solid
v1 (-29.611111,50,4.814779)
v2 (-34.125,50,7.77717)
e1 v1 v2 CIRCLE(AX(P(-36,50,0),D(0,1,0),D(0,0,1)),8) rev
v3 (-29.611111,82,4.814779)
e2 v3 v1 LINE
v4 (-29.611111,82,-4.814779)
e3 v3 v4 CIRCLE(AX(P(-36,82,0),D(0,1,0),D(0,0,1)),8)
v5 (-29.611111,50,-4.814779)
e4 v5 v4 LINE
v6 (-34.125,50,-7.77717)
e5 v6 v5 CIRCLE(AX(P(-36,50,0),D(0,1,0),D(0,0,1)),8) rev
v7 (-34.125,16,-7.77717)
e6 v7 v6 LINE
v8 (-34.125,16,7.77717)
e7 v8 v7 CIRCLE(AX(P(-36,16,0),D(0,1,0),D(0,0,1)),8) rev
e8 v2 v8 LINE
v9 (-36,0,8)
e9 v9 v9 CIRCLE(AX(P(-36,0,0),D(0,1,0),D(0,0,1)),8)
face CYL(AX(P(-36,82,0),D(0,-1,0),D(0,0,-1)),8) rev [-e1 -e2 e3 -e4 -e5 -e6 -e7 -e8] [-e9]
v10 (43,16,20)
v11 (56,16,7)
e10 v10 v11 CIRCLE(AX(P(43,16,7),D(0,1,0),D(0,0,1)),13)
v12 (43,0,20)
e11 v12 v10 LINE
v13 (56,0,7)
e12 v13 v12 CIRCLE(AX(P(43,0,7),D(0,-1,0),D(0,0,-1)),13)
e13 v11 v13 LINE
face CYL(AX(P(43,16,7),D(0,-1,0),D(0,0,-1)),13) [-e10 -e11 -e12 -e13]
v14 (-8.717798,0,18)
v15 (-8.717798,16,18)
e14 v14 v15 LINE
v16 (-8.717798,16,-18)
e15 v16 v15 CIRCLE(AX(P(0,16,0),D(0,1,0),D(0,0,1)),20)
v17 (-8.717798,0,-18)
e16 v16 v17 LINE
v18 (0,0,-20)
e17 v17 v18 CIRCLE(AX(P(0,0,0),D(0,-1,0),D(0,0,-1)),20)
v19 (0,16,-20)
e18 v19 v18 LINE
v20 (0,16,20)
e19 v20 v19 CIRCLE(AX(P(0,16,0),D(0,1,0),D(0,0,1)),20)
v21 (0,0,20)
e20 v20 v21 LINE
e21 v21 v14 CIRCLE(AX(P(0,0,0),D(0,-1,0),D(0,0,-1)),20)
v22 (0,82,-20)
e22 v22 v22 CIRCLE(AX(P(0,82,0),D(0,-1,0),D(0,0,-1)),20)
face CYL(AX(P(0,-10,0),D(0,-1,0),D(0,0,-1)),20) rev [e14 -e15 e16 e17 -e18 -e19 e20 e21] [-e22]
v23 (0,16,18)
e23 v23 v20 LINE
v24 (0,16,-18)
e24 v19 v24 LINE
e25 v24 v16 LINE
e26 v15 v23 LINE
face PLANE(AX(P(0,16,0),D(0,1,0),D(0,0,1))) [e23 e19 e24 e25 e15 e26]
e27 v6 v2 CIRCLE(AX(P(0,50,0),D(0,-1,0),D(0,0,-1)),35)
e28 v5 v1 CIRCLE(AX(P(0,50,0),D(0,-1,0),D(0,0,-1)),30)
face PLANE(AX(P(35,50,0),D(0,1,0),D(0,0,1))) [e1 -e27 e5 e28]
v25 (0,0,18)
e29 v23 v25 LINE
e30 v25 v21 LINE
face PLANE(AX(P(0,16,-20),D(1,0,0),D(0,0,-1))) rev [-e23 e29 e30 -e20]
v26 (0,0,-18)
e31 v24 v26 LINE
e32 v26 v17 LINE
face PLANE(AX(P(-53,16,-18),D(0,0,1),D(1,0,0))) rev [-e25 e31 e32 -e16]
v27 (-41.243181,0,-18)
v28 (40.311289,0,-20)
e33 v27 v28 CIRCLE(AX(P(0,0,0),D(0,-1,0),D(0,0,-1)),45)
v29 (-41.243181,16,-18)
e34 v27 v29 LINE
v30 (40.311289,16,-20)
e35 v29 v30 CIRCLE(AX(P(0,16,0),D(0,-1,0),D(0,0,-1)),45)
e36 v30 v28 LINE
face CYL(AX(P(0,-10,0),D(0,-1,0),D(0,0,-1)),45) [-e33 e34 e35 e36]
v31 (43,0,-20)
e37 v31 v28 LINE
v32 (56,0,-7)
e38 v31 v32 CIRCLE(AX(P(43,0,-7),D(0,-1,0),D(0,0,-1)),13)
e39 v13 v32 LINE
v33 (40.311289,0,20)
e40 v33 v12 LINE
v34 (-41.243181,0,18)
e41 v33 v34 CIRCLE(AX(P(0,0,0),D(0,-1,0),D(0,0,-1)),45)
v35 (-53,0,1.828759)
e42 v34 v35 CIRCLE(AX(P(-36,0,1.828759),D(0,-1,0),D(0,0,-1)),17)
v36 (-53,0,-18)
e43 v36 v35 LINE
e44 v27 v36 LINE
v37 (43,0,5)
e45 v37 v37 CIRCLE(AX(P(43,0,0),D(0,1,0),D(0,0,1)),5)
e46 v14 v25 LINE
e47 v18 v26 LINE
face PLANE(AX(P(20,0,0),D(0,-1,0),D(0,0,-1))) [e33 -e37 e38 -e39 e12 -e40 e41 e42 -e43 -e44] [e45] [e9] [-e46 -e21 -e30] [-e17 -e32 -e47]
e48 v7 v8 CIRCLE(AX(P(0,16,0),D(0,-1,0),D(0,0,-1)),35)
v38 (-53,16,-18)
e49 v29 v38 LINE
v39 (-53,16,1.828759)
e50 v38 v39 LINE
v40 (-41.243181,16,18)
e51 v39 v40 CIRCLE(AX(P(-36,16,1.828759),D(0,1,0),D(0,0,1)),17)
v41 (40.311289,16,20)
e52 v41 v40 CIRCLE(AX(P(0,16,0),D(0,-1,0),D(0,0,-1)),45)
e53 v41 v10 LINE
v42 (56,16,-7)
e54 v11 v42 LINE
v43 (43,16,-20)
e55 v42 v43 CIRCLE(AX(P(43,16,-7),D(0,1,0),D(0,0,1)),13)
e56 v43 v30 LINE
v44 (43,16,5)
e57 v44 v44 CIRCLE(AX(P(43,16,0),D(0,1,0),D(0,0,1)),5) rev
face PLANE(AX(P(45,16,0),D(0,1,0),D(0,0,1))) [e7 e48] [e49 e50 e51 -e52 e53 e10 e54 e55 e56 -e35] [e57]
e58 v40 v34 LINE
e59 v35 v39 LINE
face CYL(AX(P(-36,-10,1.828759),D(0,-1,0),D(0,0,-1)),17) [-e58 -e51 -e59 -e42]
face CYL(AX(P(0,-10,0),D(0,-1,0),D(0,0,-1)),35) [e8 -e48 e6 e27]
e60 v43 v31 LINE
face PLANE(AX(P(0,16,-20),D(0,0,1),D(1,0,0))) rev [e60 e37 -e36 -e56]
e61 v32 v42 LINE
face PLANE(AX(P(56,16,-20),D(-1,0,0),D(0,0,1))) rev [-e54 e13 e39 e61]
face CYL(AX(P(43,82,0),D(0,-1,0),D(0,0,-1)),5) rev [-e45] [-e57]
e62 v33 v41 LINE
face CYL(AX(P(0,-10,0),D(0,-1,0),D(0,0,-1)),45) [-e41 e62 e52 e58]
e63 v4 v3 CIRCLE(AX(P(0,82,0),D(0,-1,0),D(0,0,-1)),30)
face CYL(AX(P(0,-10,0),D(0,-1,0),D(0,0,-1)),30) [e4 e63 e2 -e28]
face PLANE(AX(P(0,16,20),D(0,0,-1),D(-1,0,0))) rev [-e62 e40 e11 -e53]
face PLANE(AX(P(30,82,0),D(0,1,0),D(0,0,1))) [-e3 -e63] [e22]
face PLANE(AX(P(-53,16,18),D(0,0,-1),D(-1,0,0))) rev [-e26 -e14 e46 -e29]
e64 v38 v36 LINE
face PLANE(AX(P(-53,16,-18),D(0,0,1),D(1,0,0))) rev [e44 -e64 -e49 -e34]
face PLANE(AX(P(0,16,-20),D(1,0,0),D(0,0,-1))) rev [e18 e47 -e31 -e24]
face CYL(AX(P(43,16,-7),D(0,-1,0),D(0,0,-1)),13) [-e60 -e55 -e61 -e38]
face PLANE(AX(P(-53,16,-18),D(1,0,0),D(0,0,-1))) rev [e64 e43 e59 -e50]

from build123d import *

# Parameters (mm, degrees)
SKETCH_9_W          = 53
SKETCH_9_H          = 36
EXTRUDE_1_DEPTH     = 16
SKETCH_10_W         = 56
SKETCH_10_H         = 40
EXTRUDE_2_DEPTH     = 16
SKETCH_11_R         = 8
CUT_EXTRUDE_3_DEPTH = 82
SKETCH_12_R         = 5
CUT_EXTRUDE_6_DEPTH = 82
FILLET_1_R          = 17
FILLET_2_R          = 13


with BuildPart() as part:
    # 草图8 → 旋转1 (revolve)
    with BuildSketch(Plane.XY, mode=Mode.PRIVATE) as revolve_1_sk:
        Polygon((20, 0), (45, 0), (45, 16), (35, 16), (35, 50), (30, 50), (30, 82), (20, 82), align=None)
    revolve(revolve_1_sk.sketch.rotate(Axis((0, -10, 0), (0, 1, 0)), 90), axis=Axis((0, -10, 0), (0, 1, 0)))

    # 草图9 → 凸台-拉伸1 (add)
    with BuildSketch(Plane(origin=(0, 0, 0), x_dir=(1, 0, 0), z_dir=(0, 1, 0))):
        with Locations((-26.5, 0)):
            Rectangle(SKETCH_9_W, SKETCH_9_H)
    extrude(amount=EXTRUDE_1_DEPTH)

    # 草图10 → 凸台-拉伸2 (add)
    with BuildSketch(Plane(origin=(0, 0, 0), x_dir=(1, 0, 0), z_dir=(0, 1, 0))):
        with Locations((28, 0)):
            Rectangle(SKETCH_10_W, SKETCH_10_H)
    extrude(amount=EXTRUDE_2_DEPTH)

    # 草图11 → 切除-拉伸3 (cut)
    with BuildSketch(Plane(origin=(0, 0, 0), x_dir=(1, 0, 0), z_dir=(0, 1, 0))):
        with Locations(Location((-36, 0, 0), (0, 0, 76.445215963))):
            Circle(SKETCH_11_R)
    extrude(amount=CUT_EXTRUDE_3_DEPTH, mode=Mode.SUBTRACT)

    # 草图12 → 切除-拉伸6 (cut)
    with BuildSketch(Plane(origin=(0, 0, 0), x_dir=(1, 0, 0), z_dir=(0, 1, 0))):
        with Locations(Location((43, 0, 0), (0, 0, 270))):
            Circle(SKETCH_12_R)
    extrude(amount=CUT_EXTRUDE_6_DEPTH, mode=Mode.SUBTRACT)

    # 圆角1
    # the kernel refuses this fillet: 17 mm, written as the material it takes off along each edge
    with BuildSketch(Plane(origin=(-53, -40.428103648, 18), x_dir=(0, 0, -1), z_dir=(0, 1, 0))) as fillet_1_piece_1:
        with BuildLine():
            CenterArc((16.171241459, -17), FILLET_1_R, 90, 72.035815704)
            Line((0, -11.756818745), (-0.323424829, -11.65195512))
            ThreePointArc((-0.323424829, -11.65195512), (-0.34, -5.878409373), (-0.34, 0))
            Line((-0.34, 0), (0, 0.34))
            Line((0, 0.34), (16.171241459, 0.34))
            Line((16.171241459, 0.34), (16.171241459, 0))
        make_face()
    extrude(amount=96.856207296, mode=Mode.SUBTRACT)

    # 圆角2
    fillet_2_edges = [part.edges().sort_by_distance(p)[0] for p in [
        (56, 8, 20),
        (56, 8, -20),
    ]]
    fillet(fillet_2_edges, radius=FILLET_2_R)


solid = part.part
